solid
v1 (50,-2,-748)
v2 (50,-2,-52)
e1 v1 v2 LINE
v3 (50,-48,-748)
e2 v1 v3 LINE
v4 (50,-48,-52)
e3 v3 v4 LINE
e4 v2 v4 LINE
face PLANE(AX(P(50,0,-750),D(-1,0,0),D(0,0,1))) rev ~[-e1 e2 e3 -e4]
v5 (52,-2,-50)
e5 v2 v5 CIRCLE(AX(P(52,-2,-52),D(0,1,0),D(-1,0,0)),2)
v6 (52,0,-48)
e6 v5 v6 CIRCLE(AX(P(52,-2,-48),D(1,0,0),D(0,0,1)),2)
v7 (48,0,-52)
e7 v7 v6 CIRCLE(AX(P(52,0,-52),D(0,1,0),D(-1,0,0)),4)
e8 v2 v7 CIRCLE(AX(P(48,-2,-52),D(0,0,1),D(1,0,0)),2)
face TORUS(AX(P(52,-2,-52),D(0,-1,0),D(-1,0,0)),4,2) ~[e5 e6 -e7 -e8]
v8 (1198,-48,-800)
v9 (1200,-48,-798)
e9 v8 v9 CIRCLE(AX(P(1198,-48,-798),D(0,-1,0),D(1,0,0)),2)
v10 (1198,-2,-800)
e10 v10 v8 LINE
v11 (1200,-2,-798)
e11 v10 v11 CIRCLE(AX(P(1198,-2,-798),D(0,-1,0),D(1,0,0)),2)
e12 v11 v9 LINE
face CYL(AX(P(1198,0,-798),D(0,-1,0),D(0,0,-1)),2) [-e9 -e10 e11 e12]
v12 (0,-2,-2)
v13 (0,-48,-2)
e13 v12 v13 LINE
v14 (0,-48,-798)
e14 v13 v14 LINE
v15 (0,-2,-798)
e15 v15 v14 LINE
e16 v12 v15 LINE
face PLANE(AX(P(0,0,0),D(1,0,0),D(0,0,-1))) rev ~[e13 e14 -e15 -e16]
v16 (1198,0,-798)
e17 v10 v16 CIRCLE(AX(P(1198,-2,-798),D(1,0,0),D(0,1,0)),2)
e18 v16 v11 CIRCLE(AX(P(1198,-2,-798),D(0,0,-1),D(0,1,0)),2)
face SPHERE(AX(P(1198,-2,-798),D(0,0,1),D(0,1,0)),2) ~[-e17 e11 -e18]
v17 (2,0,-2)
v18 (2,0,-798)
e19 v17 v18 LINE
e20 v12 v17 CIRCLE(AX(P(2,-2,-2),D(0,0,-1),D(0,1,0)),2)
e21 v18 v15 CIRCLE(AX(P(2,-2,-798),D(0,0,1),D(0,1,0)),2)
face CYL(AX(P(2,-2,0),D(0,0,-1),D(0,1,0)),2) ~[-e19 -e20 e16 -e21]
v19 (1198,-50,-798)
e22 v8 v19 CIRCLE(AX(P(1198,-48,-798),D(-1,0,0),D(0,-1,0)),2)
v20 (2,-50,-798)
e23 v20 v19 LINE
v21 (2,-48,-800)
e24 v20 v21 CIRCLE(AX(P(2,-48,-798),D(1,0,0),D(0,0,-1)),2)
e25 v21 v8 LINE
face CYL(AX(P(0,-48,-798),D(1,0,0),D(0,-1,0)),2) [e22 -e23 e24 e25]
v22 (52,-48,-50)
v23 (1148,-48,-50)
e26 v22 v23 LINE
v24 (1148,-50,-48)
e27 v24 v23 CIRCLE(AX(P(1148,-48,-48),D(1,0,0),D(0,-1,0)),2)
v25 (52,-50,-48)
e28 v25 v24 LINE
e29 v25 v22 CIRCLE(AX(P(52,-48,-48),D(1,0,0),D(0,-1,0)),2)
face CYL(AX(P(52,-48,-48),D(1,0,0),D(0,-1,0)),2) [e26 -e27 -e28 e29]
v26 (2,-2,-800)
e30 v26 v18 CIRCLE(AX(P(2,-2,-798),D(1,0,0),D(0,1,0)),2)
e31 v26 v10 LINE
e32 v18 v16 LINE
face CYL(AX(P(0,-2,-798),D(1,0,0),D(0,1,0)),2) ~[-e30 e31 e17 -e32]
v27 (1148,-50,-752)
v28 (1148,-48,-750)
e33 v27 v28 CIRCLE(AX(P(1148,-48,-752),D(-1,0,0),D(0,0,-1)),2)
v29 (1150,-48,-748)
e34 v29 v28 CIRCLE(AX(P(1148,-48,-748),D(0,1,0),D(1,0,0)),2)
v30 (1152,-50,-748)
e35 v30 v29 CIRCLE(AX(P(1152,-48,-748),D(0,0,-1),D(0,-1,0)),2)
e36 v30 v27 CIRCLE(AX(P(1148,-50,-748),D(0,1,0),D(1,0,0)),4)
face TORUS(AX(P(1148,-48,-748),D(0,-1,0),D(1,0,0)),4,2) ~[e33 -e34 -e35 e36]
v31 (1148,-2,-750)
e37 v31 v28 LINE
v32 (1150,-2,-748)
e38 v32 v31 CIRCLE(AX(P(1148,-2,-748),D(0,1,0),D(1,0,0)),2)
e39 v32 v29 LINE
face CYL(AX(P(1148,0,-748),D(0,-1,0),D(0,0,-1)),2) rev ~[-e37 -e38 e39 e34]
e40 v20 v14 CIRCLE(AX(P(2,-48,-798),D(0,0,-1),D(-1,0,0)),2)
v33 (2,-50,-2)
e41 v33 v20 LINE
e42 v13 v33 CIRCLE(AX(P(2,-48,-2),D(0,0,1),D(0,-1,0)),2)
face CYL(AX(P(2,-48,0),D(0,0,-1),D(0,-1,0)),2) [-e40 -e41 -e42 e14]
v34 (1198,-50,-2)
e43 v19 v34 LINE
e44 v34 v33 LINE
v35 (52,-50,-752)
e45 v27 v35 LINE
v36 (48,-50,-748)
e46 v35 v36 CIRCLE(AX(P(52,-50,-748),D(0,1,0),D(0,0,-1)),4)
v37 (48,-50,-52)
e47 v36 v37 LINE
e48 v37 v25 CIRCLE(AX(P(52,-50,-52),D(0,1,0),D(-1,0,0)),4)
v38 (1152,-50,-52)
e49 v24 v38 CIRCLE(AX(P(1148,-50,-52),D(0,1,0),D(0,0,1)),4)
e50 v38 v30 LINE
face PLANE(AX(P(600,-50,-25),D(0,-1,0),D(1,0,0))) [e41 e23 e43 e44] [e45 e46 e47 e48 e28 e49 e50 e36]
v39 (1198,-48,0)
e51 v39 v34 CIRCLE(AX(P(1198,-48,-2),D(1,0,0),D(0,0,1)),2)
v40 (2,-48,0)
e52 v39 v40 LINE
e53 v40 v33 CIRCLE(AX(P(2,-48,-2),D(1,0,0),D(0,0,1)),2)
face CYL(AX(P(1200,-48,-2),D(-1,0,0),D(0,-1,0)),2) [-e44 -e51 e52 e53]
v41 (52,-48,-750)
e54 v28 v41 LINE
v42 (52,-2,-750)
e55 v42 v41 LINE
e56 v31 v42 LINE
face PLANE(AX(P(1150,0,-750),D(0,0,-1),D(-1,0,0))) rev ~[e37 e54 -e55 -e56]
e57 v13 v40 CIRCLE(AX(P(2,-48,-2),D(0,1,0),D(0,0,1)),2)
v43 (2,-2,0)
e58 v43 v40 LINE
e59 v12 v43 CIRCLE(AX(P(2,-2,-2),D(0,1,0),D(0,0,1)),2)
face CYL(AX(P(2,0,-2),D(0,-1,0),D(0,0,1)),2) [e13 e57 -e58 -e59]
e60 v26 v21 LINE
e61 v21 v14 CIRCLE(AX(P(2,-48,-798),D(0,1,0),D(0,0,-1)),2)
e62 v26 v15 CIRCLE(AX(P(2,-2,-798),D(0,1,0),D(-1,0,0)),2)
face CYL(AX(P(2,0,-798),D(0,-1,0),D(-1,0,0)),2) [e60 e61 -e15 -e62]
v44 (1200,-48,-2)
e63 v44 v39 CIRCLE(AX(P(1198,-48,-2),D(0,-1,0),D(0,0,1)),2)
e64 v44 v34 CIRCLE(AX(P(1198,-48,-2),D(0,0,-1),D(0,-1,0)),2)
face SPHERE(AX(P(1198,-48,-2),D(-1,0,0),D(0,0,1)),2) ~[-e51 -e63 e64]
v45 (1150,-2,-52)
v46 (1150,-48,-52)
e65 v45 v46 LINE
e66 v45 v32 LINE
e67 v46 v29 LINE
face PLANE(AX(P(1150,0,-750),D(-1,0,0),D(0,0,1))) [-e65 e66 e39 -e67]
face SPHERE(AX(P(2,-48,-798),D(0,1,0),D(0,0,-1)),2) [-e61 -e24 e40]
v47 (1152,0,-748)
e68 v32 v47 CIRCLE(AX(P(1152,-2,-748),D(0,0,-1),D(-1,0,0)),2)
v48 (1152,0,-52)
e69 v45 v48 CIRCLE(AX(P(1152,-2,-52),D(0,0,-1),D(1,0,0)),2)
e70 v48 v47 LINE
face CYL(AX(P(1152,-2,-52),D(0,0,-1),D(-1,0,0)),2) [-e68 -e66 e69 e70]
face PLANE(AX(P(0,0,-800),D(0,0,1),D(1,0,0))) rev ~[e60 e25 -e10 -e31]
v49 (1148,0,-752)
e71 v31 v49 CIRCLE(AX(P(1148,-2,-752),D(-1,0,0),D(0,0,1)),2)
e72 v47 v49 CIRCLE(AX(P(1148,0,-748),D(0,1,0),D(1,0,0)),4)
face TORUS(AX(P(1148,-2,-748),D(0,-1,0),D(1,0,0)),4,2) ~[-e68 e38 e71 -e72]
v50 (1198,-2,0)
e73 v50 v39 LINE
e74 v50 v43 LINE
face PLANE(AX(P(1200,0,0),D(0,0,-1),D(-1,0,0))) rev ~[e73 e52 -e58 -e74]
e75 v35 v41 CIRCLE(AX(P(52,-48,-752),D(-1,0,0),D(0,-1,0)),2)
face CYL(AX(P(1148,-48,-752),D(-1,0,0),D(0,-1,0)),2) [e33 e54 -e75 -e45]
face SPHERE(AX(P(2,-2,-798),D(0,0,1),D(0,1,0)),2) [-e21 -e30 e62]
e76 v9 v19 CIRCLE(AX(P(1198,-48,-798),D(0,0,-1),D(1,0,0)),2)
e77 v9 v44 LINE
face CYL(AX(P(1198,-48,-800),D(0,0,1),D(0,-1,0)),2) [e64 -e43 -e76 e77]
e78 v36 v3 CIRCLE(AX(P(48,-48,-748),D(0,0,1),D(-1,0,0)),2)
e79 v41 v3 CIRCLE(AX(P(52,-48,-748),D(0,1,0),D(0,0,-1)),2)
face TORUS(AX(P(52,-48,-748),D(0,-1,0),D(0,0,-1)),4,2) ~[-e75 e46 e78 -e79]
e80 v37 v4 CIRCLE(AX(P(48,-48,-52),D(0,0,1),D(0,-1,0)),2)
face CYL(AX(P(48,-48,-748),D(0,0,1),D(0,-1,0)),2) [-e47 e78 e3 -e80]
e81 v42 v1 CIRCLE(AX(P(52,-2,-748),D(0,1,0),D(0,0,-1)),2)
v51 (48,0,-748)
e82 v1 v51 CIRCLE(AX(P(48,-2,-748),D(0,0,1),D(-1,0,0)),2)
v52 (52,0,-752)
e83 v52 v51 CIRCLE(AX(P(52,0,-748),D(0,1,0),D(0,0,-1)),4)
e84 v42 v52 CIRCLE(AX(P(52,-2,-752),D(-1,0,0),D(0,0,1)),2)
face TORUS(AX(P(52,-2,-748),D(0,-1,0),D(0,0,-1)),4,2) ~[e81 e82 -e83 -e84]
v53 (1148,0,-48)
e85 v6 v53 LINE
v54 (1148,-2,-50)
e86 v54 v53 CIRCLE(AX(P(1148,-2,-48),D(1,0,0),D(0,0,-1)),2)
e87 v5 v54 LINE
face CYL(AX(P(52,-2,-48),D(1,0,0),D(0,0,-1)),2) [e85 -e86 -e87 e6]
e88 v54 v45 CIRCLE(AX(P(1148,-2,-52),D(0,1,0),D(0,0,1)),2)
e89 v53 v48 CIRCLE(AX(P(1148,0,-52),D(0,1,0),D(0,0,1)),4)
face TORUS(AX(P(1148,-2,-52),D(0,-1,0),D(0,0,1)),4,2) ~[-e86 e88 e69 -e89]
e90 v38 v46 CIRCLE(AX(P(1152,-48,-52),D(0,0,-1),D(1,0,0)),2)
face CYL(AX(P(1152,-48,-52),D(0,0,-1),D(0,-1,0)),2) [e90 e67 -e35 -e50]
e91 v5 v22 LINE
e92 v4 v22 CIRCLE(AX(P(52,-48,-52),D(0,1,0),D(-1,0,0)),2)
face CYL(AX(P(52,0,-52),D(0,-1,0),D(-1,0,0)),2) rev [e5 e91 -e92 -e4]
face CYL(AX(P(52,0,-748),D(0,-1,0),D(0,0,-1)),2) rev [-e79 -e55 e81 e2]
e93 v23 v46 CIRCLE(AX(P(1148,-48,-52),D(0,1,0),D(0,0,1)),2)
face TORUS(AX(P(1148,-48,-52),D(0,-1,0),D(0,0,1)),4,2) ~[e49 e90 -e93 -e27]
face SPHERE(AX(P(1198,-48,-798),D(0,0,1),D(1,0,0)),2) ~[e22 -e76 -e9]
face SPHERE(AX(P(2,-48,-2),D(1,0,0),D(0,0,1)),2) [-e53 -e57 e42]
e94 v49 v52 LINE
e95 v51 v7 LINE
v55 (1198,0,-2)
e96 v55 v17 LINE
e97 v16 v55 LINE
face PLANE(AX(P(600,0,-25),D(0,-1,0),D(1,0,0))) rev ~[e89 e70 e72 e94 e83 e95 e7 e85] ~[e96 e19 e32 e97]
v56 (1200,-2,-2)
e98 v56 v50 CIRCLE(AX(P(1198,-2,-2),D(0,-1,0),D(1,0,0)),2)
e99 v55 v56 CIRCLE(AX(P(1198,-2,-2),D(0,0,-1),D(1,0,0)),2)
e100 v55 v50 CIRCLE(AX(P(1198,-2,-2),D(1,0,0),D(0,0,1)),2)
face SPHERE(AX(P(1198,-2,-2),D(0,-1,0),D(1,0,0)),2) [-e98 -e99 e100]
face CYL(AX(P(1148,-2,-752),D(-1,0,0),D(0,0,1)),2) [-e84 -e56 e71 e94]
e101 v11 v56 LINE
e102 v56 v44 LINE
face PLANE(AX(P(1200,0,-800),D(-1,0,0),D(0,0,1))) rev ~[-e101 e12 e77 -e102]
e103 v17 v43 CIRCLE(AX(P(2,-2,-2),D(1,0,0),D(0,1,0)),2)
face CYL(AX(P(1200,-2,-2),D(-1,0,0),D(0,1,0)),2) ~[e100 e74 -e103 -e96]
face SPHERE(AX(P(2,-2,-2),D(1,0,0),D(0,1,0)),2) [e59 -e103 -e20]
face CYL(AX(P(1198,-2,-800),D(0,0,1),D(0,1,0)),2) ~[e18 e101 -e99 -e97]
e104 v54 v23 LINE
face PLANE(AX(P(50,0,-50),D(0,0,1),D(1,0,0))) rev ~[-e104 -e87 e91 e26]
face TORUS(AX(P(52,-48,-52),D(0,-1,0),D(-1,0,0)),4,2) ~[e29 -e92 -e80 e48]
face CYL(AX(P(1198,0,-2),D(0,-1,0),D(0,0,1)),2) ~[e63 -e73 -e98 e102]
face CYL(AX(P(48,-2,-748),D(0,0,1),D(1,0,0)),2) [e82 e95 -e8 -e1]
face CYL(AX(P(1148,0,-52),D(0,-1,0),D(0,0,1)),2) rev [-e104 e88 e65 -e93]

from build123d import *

# Parameters (mm, degrees)
F0_W     = 50
F0_H     = 700
F1_DEPTH = 50
F2_F1_R  = 2
F2_F2_R  = 2
F2_F3_R  = 2


with BuildPart() as f1:
    # F0 (on Front) → F1 (new body)
    with BuildSketch(Plane.XZ):
        Polygon((1200, 0), (0, 0), (0, -50), (50, -50), (1150, -50), (1200, -50), align=None)
        with Locations((25, -400)):
            Rectangle(F0_W, F0_H)
        Polygon((50, -750), (0, -750), (0, -800), (1200, -800), (1200, -750), (1150, -750), align=None)
        with Locations((1175, -400)):
            Rectangle(F0_W, F0_H)
    extrude(amount=F1_DEPTH)

    # F2: fillet of radius 2 on 22 edges, made by hand

    # F2_f1
    f2_f1_edges = [f1.edges().sort_by_distance(p)[0] for p in [
        (50, -25, -50),
        (1150, -25, -50),
        (1150, -25, -750),
        (50, -25, -750),
    ]]
    fillet(f2_f1_edges, radius=F2_F1_R)

    # F2_f2
    f2_f2_edges = [f1.edges().sort_by_distance(p)[0] for p in [
        (600, -50, 0),
        (1200, -25, 0),
        (1200, -50, -400),
        (1200, 0, -400),
        (600, 0, 0),
        (0, 0, -400),
        (600, 0, -800),
        (600, -50, -50),
        (600, -50, -750),
        (0, -25, -800),
        (1200, -25, -800),
        (600, -50, -800),
        (0, -25, 0),
        (0, -50, -400),
        (1149.4142135624, -50, -749.4142135624),
        (50.5857864376, -50, -749.4142135624),
        (50.5857864376, -50, -50.5857864376),
        (1149.4142135624, -50, -50.5857864376),
    ]]
    fillet(f2_f2_edges, radius=F2_F2_R)

    # F2_f3
    f2_f3_edges = [f1.edges().sort_by_distance(p)[0] for p in [
        (600, 0, -750),
        (50, 0, -400),
        (600, 0, -50),
        (1150, 0, -400),
        (1149.4142135624, 0, -50.5857864376),
        (1149.4142135624, 0, -749.4142135624),
        (50.5857864376, 0, -50.5857864376),
        (50.5857864376, 0, -749.4142135624),
    ]]
    fillet(f2_f3_edges, radius=F2_F3_R)


solid = f1.part
